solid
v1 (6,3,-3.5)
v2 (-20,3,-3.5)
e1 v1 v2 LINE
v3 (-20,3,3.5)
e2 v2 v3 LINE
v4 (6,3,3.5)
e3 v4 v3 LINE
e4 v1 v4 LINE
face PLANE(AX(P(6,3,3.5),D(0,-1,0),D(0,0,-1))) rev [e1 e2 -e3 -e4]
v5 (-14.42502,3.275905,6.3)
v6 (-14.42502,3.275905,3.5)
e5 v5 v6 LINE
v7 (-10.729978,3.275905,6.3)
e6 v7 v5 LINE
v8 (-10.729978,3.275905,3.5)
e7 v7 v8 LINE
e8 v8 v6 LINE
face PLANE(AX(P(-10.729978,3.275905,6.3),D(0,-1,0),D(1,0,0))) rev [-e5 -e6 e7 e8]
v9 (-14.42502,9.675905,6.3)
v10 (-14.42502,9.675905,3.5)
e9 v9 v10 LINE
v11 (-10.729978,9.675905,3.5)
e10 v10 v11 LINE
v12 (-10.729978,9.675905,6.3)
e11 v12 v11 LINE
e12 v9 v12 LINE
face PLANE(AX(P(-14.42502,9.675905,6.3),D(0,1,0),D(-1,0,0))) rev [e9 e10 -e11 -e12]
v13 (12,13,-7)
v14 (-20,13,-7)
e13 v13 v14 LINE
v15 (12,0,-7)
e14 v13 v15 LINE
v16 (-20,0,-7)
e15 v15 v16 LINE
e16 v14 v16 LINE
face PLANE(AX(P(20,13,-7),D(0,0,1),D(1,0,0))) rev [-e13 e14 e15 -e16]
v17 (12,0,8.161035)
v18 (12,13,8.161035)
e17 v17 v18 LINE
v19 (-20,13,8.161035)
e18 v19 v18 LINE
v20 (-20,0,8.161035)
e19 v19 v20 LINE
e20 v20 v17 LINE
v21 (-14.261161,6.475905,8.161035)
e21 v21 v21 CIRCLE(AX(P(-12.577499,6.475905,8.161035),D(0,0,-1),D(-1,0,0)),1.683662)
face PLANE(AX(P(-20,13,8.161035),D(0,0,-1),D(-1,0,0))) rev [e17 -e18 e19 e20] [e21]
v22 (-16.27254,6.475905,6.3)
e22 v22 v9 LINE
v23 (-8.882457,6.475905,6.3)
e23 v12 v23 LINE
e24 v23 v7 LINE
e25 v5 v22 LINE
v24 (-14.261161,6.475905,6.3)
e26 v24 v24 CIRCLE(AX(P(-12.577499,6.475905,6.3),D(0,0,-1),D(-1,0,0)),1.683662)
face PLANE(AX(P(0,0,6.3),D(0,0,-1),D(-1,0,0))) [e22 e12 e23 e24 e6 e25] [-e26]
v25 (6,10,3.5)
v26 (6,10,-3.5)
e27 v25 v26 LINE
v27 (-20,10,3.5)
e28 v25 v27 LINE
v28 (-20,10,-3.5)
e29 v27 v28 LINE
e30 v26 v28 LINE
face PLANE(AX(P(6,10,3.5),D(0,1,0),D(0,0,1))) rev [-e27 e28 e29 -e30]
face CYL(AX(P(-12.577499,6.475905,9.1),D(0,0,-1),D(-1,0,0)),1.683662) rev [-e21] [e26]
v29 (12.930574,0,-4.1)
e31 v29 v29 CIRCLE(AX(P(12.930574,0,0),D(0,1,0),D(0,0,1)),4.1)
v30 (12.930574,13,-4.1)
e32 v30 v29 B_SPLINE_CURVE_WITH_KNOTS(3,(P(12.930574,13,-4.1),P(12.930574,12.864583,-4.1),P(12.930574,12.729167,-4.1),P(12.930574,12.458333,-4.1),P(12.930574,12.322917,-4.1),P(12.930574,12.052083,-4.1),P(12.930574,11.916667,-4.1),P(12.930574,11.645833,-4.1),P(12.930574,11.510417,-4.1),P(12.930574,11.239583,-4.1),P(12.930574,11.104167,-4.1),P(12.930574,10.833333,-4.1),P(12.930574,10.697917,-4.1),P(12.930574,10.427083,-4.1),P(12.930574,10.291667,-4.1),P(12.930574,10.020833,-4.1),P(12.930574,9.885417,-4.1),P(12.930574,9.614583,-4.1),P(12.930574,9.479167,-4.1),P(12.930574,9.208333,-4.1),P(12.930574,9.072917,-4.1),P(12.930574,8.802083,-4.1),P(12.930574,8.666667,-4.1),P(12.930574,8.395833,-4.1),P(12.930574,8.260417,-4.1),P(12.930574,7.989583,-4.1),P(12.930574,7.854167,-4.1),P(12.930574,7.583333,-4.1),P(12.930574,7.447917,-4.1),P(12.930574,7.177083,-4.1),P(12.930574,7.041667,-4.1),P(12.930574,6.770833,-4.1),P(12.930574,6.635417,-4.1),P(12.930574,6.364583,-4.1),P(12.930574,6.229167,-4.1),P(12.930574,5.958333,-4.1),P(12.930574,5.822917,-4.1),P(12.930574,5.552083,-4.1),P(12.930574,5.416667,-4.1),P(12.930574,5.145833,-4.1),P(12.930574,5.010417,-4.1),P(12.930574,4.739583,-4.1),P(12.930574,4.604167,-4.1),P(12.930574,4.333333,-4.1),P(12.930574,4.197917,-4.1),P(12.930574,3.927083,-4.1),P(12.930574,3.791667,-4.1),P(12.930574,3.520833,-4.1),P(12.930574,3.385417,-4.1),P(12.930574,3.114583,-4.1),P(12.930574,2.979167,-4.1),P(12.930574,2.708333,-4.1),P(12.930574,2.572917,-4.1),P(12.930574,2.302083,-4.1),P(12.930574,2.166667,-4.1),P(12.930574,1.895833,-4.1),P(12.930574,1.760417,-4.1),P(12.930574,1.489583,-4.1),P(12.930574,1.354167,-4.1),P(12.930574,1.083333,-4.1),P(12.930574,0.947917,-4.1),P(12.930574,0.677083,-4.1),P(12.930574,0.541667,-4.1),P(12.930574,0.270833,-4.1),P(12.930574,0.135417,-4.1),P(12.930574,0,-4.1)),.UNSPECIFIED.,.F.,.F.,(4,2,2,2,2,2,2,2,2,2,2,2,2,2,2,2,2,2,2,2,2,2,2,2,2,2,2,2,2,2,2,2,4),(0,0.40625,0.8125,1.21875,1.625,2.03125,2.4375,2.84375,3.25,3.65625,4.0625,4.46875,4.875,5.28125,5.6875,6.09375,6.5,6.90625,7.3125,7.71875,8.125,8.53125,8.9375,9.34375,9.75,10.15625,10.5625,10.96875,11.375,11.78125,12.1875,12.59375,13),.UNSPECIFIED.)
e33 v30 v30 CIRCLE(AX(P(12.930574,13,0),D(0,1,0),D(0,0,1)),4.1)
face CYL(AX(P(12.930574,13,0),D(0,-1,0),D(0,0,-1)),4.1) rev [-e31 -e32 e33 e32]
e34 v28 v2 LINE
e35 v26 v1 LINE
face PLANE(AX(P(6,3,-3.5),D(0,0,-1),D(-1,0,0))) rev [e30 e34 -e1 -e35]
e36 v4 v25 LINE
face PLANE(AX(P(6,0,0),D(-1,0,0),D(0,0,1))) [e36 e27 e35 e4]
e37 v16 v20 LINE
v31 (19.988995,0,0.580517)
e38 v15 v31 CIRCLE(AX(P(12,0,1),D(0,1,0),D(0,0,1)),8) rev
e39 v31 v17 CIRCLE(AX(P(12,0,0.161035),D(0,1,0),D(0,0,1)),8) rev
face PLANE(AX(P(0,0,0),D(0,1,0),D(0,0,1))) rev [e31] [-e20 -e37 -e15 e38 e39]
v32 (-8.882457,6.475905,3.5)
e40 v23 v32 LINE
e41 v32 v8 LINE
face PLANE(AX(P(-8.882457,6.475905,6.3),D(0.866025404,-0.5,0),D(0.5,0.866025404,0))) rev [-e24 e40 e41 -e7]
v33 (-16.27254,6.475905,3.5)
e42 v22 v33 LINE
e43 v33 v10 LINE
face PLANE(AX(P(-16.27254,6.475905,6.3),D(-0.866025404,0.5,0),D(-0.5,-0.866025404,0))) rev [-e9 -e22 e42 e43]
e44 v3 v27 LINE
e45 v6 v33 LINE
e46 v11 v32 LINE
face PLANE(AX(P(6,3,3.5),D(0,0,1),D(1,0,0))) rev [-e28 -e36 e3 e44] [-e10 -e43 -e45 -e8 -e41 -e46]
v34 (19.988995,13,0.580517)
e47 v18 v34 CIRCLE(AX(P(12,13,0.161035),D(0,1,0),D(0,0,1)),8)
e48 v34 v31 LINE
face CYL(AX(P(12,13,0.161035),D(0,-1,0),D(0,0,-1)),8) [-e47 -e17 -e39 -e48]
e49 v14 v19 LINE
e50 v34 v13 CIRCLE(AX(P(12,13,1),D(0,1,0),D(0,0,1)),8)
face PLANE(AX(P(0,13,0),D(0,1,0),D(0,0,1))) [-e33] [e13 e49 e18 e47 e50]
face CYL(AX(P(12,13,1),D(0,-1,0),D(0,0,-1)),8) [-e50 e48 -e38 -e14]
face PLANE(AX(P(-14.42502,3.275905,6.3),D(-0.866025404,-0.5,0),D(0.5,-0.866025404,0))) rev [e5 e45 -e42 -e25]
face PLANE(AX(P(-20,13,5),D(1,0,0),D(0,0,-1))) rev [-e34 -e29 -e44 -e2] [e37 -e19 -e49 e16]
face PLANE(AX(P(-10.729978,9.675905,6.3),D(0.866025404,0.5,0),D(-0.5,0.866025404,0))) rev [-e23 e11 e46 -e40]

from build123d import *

# Parameters (mm, degrees)
ESBO_O2_R                = 4.1
RESSALTO_EXTRUS_O1_DEPTH = 13
ESBO_O3_W                = 7
ESBO_O3_H                = 7
CORTE_EXTRUS_O1_DEPTH    = 26
CORTE_EXTRUS_O2_DEPTH    = 2.8
ESBO_O10_R               = 1.683661958
CORTE_EXTRUS_O3_DEPTH    = 2.8
FILETE1_R                = 8


with BuildPart() as part:
    # Esboço2 → Ressalto-extrusão1 (new body)
    with BuildSketch(Plane(origin=(0, 0, 0), x_dir=(1, 0, 0), z_dir=(0, 1, 0))):
        Polygon((20, -5), (20, 7), (-20, 7), (-20, -5), (-20, -8.161034979), (20, -8.161034979), align=None)
        with Locations(Location((12.930574096, 0, 0), (0, 0, 90))):
            Circle(ESBO_O2_R, mode=Mode.SUBTRACT)
    extrude(amount=RESSALTO_EXTRUS_O1_DEPTH)

    # Esboço3 → Corte-extrusão1 (cut)
    with BuildSketch(Plane.ZY.offset(20)):
        with Locations((0, 6.5)):
            Rectangle(ESBO_O3_W, ESBO_O3_H)
    extrude(amount=-CORTE_EXTRUS_O1_DEPTH, mode=Mode.SUBTRACT)

    # Esboço7 → Corte-extrusão2 (cut)
    with BuildSketch(Plane(origin=(0, 0, 3.5), x_dir=(-1, 0, 0), z_dir=(0, 0, -1))):
        Polygon((8.882456985, 6.475905175), (10.729977846, 3.275905175), (14.425019569, 3.275905175), (16.272540431, 6.475905175), (14.425019569, 9.675905175), (10.729977846, 9.675905175), align=None)
    extrude(amount=-CORTE_EXTRUS_O2_DEPTH, mode=Mode.SUBTRACT)

    # Esboço10 → Corte-extrusão3 (cut)
    with BuildSketch(Plane(origin=(0, 0, 6.3), x_dir=(-1, 0, 0), z_dir=(0, 0, -1))):
        with Locations((12.577498708, 6.475905175)):
            Circle(ESBO_O10_R)
    extrude(amount=-CORTE_EXTRUS_O3_DEPTH, mode=Mode.SUBTRACT)

    # Filete1
    # the kernel refuses this fillet: 8 mm, written as the material it takes off along each edge
    with BuildSketch(Plane(origin=(20, -20, -7), x_dir=(0, 0, 1), z_dir=(0, 1, 0))) as filete1_piece_1:
        with BuildLine():
            CenterArc((FILETE1_R, -FILETE1_R), FILETE1_R, 90, 90)
            Line((0, -FILETE1_R), (0, 0))
            Line((0, 0), (FILETE1_R, 0))
        make_face()
    extrude(amount=53, mode=Mode.SUBTRACT)
    with BuildSketch(Plane(origin=(20, -20, 8.161034979), x_dir=(0, 0, -1), z_dir=(0, 1, 0))) as filete1_piece_2:
        with BuildLine():
            CenterArc((FILETE1_R, FILETE1_R), FILETE1_R, 180, 90)
            Line((0, FILETE1_R), (0, 0))
            Line((0, 0), (FILETE1_R, 0))
        make_face()
    extrude(amount=53, mode=Mode.SUBTRACT)


solid = part.part
